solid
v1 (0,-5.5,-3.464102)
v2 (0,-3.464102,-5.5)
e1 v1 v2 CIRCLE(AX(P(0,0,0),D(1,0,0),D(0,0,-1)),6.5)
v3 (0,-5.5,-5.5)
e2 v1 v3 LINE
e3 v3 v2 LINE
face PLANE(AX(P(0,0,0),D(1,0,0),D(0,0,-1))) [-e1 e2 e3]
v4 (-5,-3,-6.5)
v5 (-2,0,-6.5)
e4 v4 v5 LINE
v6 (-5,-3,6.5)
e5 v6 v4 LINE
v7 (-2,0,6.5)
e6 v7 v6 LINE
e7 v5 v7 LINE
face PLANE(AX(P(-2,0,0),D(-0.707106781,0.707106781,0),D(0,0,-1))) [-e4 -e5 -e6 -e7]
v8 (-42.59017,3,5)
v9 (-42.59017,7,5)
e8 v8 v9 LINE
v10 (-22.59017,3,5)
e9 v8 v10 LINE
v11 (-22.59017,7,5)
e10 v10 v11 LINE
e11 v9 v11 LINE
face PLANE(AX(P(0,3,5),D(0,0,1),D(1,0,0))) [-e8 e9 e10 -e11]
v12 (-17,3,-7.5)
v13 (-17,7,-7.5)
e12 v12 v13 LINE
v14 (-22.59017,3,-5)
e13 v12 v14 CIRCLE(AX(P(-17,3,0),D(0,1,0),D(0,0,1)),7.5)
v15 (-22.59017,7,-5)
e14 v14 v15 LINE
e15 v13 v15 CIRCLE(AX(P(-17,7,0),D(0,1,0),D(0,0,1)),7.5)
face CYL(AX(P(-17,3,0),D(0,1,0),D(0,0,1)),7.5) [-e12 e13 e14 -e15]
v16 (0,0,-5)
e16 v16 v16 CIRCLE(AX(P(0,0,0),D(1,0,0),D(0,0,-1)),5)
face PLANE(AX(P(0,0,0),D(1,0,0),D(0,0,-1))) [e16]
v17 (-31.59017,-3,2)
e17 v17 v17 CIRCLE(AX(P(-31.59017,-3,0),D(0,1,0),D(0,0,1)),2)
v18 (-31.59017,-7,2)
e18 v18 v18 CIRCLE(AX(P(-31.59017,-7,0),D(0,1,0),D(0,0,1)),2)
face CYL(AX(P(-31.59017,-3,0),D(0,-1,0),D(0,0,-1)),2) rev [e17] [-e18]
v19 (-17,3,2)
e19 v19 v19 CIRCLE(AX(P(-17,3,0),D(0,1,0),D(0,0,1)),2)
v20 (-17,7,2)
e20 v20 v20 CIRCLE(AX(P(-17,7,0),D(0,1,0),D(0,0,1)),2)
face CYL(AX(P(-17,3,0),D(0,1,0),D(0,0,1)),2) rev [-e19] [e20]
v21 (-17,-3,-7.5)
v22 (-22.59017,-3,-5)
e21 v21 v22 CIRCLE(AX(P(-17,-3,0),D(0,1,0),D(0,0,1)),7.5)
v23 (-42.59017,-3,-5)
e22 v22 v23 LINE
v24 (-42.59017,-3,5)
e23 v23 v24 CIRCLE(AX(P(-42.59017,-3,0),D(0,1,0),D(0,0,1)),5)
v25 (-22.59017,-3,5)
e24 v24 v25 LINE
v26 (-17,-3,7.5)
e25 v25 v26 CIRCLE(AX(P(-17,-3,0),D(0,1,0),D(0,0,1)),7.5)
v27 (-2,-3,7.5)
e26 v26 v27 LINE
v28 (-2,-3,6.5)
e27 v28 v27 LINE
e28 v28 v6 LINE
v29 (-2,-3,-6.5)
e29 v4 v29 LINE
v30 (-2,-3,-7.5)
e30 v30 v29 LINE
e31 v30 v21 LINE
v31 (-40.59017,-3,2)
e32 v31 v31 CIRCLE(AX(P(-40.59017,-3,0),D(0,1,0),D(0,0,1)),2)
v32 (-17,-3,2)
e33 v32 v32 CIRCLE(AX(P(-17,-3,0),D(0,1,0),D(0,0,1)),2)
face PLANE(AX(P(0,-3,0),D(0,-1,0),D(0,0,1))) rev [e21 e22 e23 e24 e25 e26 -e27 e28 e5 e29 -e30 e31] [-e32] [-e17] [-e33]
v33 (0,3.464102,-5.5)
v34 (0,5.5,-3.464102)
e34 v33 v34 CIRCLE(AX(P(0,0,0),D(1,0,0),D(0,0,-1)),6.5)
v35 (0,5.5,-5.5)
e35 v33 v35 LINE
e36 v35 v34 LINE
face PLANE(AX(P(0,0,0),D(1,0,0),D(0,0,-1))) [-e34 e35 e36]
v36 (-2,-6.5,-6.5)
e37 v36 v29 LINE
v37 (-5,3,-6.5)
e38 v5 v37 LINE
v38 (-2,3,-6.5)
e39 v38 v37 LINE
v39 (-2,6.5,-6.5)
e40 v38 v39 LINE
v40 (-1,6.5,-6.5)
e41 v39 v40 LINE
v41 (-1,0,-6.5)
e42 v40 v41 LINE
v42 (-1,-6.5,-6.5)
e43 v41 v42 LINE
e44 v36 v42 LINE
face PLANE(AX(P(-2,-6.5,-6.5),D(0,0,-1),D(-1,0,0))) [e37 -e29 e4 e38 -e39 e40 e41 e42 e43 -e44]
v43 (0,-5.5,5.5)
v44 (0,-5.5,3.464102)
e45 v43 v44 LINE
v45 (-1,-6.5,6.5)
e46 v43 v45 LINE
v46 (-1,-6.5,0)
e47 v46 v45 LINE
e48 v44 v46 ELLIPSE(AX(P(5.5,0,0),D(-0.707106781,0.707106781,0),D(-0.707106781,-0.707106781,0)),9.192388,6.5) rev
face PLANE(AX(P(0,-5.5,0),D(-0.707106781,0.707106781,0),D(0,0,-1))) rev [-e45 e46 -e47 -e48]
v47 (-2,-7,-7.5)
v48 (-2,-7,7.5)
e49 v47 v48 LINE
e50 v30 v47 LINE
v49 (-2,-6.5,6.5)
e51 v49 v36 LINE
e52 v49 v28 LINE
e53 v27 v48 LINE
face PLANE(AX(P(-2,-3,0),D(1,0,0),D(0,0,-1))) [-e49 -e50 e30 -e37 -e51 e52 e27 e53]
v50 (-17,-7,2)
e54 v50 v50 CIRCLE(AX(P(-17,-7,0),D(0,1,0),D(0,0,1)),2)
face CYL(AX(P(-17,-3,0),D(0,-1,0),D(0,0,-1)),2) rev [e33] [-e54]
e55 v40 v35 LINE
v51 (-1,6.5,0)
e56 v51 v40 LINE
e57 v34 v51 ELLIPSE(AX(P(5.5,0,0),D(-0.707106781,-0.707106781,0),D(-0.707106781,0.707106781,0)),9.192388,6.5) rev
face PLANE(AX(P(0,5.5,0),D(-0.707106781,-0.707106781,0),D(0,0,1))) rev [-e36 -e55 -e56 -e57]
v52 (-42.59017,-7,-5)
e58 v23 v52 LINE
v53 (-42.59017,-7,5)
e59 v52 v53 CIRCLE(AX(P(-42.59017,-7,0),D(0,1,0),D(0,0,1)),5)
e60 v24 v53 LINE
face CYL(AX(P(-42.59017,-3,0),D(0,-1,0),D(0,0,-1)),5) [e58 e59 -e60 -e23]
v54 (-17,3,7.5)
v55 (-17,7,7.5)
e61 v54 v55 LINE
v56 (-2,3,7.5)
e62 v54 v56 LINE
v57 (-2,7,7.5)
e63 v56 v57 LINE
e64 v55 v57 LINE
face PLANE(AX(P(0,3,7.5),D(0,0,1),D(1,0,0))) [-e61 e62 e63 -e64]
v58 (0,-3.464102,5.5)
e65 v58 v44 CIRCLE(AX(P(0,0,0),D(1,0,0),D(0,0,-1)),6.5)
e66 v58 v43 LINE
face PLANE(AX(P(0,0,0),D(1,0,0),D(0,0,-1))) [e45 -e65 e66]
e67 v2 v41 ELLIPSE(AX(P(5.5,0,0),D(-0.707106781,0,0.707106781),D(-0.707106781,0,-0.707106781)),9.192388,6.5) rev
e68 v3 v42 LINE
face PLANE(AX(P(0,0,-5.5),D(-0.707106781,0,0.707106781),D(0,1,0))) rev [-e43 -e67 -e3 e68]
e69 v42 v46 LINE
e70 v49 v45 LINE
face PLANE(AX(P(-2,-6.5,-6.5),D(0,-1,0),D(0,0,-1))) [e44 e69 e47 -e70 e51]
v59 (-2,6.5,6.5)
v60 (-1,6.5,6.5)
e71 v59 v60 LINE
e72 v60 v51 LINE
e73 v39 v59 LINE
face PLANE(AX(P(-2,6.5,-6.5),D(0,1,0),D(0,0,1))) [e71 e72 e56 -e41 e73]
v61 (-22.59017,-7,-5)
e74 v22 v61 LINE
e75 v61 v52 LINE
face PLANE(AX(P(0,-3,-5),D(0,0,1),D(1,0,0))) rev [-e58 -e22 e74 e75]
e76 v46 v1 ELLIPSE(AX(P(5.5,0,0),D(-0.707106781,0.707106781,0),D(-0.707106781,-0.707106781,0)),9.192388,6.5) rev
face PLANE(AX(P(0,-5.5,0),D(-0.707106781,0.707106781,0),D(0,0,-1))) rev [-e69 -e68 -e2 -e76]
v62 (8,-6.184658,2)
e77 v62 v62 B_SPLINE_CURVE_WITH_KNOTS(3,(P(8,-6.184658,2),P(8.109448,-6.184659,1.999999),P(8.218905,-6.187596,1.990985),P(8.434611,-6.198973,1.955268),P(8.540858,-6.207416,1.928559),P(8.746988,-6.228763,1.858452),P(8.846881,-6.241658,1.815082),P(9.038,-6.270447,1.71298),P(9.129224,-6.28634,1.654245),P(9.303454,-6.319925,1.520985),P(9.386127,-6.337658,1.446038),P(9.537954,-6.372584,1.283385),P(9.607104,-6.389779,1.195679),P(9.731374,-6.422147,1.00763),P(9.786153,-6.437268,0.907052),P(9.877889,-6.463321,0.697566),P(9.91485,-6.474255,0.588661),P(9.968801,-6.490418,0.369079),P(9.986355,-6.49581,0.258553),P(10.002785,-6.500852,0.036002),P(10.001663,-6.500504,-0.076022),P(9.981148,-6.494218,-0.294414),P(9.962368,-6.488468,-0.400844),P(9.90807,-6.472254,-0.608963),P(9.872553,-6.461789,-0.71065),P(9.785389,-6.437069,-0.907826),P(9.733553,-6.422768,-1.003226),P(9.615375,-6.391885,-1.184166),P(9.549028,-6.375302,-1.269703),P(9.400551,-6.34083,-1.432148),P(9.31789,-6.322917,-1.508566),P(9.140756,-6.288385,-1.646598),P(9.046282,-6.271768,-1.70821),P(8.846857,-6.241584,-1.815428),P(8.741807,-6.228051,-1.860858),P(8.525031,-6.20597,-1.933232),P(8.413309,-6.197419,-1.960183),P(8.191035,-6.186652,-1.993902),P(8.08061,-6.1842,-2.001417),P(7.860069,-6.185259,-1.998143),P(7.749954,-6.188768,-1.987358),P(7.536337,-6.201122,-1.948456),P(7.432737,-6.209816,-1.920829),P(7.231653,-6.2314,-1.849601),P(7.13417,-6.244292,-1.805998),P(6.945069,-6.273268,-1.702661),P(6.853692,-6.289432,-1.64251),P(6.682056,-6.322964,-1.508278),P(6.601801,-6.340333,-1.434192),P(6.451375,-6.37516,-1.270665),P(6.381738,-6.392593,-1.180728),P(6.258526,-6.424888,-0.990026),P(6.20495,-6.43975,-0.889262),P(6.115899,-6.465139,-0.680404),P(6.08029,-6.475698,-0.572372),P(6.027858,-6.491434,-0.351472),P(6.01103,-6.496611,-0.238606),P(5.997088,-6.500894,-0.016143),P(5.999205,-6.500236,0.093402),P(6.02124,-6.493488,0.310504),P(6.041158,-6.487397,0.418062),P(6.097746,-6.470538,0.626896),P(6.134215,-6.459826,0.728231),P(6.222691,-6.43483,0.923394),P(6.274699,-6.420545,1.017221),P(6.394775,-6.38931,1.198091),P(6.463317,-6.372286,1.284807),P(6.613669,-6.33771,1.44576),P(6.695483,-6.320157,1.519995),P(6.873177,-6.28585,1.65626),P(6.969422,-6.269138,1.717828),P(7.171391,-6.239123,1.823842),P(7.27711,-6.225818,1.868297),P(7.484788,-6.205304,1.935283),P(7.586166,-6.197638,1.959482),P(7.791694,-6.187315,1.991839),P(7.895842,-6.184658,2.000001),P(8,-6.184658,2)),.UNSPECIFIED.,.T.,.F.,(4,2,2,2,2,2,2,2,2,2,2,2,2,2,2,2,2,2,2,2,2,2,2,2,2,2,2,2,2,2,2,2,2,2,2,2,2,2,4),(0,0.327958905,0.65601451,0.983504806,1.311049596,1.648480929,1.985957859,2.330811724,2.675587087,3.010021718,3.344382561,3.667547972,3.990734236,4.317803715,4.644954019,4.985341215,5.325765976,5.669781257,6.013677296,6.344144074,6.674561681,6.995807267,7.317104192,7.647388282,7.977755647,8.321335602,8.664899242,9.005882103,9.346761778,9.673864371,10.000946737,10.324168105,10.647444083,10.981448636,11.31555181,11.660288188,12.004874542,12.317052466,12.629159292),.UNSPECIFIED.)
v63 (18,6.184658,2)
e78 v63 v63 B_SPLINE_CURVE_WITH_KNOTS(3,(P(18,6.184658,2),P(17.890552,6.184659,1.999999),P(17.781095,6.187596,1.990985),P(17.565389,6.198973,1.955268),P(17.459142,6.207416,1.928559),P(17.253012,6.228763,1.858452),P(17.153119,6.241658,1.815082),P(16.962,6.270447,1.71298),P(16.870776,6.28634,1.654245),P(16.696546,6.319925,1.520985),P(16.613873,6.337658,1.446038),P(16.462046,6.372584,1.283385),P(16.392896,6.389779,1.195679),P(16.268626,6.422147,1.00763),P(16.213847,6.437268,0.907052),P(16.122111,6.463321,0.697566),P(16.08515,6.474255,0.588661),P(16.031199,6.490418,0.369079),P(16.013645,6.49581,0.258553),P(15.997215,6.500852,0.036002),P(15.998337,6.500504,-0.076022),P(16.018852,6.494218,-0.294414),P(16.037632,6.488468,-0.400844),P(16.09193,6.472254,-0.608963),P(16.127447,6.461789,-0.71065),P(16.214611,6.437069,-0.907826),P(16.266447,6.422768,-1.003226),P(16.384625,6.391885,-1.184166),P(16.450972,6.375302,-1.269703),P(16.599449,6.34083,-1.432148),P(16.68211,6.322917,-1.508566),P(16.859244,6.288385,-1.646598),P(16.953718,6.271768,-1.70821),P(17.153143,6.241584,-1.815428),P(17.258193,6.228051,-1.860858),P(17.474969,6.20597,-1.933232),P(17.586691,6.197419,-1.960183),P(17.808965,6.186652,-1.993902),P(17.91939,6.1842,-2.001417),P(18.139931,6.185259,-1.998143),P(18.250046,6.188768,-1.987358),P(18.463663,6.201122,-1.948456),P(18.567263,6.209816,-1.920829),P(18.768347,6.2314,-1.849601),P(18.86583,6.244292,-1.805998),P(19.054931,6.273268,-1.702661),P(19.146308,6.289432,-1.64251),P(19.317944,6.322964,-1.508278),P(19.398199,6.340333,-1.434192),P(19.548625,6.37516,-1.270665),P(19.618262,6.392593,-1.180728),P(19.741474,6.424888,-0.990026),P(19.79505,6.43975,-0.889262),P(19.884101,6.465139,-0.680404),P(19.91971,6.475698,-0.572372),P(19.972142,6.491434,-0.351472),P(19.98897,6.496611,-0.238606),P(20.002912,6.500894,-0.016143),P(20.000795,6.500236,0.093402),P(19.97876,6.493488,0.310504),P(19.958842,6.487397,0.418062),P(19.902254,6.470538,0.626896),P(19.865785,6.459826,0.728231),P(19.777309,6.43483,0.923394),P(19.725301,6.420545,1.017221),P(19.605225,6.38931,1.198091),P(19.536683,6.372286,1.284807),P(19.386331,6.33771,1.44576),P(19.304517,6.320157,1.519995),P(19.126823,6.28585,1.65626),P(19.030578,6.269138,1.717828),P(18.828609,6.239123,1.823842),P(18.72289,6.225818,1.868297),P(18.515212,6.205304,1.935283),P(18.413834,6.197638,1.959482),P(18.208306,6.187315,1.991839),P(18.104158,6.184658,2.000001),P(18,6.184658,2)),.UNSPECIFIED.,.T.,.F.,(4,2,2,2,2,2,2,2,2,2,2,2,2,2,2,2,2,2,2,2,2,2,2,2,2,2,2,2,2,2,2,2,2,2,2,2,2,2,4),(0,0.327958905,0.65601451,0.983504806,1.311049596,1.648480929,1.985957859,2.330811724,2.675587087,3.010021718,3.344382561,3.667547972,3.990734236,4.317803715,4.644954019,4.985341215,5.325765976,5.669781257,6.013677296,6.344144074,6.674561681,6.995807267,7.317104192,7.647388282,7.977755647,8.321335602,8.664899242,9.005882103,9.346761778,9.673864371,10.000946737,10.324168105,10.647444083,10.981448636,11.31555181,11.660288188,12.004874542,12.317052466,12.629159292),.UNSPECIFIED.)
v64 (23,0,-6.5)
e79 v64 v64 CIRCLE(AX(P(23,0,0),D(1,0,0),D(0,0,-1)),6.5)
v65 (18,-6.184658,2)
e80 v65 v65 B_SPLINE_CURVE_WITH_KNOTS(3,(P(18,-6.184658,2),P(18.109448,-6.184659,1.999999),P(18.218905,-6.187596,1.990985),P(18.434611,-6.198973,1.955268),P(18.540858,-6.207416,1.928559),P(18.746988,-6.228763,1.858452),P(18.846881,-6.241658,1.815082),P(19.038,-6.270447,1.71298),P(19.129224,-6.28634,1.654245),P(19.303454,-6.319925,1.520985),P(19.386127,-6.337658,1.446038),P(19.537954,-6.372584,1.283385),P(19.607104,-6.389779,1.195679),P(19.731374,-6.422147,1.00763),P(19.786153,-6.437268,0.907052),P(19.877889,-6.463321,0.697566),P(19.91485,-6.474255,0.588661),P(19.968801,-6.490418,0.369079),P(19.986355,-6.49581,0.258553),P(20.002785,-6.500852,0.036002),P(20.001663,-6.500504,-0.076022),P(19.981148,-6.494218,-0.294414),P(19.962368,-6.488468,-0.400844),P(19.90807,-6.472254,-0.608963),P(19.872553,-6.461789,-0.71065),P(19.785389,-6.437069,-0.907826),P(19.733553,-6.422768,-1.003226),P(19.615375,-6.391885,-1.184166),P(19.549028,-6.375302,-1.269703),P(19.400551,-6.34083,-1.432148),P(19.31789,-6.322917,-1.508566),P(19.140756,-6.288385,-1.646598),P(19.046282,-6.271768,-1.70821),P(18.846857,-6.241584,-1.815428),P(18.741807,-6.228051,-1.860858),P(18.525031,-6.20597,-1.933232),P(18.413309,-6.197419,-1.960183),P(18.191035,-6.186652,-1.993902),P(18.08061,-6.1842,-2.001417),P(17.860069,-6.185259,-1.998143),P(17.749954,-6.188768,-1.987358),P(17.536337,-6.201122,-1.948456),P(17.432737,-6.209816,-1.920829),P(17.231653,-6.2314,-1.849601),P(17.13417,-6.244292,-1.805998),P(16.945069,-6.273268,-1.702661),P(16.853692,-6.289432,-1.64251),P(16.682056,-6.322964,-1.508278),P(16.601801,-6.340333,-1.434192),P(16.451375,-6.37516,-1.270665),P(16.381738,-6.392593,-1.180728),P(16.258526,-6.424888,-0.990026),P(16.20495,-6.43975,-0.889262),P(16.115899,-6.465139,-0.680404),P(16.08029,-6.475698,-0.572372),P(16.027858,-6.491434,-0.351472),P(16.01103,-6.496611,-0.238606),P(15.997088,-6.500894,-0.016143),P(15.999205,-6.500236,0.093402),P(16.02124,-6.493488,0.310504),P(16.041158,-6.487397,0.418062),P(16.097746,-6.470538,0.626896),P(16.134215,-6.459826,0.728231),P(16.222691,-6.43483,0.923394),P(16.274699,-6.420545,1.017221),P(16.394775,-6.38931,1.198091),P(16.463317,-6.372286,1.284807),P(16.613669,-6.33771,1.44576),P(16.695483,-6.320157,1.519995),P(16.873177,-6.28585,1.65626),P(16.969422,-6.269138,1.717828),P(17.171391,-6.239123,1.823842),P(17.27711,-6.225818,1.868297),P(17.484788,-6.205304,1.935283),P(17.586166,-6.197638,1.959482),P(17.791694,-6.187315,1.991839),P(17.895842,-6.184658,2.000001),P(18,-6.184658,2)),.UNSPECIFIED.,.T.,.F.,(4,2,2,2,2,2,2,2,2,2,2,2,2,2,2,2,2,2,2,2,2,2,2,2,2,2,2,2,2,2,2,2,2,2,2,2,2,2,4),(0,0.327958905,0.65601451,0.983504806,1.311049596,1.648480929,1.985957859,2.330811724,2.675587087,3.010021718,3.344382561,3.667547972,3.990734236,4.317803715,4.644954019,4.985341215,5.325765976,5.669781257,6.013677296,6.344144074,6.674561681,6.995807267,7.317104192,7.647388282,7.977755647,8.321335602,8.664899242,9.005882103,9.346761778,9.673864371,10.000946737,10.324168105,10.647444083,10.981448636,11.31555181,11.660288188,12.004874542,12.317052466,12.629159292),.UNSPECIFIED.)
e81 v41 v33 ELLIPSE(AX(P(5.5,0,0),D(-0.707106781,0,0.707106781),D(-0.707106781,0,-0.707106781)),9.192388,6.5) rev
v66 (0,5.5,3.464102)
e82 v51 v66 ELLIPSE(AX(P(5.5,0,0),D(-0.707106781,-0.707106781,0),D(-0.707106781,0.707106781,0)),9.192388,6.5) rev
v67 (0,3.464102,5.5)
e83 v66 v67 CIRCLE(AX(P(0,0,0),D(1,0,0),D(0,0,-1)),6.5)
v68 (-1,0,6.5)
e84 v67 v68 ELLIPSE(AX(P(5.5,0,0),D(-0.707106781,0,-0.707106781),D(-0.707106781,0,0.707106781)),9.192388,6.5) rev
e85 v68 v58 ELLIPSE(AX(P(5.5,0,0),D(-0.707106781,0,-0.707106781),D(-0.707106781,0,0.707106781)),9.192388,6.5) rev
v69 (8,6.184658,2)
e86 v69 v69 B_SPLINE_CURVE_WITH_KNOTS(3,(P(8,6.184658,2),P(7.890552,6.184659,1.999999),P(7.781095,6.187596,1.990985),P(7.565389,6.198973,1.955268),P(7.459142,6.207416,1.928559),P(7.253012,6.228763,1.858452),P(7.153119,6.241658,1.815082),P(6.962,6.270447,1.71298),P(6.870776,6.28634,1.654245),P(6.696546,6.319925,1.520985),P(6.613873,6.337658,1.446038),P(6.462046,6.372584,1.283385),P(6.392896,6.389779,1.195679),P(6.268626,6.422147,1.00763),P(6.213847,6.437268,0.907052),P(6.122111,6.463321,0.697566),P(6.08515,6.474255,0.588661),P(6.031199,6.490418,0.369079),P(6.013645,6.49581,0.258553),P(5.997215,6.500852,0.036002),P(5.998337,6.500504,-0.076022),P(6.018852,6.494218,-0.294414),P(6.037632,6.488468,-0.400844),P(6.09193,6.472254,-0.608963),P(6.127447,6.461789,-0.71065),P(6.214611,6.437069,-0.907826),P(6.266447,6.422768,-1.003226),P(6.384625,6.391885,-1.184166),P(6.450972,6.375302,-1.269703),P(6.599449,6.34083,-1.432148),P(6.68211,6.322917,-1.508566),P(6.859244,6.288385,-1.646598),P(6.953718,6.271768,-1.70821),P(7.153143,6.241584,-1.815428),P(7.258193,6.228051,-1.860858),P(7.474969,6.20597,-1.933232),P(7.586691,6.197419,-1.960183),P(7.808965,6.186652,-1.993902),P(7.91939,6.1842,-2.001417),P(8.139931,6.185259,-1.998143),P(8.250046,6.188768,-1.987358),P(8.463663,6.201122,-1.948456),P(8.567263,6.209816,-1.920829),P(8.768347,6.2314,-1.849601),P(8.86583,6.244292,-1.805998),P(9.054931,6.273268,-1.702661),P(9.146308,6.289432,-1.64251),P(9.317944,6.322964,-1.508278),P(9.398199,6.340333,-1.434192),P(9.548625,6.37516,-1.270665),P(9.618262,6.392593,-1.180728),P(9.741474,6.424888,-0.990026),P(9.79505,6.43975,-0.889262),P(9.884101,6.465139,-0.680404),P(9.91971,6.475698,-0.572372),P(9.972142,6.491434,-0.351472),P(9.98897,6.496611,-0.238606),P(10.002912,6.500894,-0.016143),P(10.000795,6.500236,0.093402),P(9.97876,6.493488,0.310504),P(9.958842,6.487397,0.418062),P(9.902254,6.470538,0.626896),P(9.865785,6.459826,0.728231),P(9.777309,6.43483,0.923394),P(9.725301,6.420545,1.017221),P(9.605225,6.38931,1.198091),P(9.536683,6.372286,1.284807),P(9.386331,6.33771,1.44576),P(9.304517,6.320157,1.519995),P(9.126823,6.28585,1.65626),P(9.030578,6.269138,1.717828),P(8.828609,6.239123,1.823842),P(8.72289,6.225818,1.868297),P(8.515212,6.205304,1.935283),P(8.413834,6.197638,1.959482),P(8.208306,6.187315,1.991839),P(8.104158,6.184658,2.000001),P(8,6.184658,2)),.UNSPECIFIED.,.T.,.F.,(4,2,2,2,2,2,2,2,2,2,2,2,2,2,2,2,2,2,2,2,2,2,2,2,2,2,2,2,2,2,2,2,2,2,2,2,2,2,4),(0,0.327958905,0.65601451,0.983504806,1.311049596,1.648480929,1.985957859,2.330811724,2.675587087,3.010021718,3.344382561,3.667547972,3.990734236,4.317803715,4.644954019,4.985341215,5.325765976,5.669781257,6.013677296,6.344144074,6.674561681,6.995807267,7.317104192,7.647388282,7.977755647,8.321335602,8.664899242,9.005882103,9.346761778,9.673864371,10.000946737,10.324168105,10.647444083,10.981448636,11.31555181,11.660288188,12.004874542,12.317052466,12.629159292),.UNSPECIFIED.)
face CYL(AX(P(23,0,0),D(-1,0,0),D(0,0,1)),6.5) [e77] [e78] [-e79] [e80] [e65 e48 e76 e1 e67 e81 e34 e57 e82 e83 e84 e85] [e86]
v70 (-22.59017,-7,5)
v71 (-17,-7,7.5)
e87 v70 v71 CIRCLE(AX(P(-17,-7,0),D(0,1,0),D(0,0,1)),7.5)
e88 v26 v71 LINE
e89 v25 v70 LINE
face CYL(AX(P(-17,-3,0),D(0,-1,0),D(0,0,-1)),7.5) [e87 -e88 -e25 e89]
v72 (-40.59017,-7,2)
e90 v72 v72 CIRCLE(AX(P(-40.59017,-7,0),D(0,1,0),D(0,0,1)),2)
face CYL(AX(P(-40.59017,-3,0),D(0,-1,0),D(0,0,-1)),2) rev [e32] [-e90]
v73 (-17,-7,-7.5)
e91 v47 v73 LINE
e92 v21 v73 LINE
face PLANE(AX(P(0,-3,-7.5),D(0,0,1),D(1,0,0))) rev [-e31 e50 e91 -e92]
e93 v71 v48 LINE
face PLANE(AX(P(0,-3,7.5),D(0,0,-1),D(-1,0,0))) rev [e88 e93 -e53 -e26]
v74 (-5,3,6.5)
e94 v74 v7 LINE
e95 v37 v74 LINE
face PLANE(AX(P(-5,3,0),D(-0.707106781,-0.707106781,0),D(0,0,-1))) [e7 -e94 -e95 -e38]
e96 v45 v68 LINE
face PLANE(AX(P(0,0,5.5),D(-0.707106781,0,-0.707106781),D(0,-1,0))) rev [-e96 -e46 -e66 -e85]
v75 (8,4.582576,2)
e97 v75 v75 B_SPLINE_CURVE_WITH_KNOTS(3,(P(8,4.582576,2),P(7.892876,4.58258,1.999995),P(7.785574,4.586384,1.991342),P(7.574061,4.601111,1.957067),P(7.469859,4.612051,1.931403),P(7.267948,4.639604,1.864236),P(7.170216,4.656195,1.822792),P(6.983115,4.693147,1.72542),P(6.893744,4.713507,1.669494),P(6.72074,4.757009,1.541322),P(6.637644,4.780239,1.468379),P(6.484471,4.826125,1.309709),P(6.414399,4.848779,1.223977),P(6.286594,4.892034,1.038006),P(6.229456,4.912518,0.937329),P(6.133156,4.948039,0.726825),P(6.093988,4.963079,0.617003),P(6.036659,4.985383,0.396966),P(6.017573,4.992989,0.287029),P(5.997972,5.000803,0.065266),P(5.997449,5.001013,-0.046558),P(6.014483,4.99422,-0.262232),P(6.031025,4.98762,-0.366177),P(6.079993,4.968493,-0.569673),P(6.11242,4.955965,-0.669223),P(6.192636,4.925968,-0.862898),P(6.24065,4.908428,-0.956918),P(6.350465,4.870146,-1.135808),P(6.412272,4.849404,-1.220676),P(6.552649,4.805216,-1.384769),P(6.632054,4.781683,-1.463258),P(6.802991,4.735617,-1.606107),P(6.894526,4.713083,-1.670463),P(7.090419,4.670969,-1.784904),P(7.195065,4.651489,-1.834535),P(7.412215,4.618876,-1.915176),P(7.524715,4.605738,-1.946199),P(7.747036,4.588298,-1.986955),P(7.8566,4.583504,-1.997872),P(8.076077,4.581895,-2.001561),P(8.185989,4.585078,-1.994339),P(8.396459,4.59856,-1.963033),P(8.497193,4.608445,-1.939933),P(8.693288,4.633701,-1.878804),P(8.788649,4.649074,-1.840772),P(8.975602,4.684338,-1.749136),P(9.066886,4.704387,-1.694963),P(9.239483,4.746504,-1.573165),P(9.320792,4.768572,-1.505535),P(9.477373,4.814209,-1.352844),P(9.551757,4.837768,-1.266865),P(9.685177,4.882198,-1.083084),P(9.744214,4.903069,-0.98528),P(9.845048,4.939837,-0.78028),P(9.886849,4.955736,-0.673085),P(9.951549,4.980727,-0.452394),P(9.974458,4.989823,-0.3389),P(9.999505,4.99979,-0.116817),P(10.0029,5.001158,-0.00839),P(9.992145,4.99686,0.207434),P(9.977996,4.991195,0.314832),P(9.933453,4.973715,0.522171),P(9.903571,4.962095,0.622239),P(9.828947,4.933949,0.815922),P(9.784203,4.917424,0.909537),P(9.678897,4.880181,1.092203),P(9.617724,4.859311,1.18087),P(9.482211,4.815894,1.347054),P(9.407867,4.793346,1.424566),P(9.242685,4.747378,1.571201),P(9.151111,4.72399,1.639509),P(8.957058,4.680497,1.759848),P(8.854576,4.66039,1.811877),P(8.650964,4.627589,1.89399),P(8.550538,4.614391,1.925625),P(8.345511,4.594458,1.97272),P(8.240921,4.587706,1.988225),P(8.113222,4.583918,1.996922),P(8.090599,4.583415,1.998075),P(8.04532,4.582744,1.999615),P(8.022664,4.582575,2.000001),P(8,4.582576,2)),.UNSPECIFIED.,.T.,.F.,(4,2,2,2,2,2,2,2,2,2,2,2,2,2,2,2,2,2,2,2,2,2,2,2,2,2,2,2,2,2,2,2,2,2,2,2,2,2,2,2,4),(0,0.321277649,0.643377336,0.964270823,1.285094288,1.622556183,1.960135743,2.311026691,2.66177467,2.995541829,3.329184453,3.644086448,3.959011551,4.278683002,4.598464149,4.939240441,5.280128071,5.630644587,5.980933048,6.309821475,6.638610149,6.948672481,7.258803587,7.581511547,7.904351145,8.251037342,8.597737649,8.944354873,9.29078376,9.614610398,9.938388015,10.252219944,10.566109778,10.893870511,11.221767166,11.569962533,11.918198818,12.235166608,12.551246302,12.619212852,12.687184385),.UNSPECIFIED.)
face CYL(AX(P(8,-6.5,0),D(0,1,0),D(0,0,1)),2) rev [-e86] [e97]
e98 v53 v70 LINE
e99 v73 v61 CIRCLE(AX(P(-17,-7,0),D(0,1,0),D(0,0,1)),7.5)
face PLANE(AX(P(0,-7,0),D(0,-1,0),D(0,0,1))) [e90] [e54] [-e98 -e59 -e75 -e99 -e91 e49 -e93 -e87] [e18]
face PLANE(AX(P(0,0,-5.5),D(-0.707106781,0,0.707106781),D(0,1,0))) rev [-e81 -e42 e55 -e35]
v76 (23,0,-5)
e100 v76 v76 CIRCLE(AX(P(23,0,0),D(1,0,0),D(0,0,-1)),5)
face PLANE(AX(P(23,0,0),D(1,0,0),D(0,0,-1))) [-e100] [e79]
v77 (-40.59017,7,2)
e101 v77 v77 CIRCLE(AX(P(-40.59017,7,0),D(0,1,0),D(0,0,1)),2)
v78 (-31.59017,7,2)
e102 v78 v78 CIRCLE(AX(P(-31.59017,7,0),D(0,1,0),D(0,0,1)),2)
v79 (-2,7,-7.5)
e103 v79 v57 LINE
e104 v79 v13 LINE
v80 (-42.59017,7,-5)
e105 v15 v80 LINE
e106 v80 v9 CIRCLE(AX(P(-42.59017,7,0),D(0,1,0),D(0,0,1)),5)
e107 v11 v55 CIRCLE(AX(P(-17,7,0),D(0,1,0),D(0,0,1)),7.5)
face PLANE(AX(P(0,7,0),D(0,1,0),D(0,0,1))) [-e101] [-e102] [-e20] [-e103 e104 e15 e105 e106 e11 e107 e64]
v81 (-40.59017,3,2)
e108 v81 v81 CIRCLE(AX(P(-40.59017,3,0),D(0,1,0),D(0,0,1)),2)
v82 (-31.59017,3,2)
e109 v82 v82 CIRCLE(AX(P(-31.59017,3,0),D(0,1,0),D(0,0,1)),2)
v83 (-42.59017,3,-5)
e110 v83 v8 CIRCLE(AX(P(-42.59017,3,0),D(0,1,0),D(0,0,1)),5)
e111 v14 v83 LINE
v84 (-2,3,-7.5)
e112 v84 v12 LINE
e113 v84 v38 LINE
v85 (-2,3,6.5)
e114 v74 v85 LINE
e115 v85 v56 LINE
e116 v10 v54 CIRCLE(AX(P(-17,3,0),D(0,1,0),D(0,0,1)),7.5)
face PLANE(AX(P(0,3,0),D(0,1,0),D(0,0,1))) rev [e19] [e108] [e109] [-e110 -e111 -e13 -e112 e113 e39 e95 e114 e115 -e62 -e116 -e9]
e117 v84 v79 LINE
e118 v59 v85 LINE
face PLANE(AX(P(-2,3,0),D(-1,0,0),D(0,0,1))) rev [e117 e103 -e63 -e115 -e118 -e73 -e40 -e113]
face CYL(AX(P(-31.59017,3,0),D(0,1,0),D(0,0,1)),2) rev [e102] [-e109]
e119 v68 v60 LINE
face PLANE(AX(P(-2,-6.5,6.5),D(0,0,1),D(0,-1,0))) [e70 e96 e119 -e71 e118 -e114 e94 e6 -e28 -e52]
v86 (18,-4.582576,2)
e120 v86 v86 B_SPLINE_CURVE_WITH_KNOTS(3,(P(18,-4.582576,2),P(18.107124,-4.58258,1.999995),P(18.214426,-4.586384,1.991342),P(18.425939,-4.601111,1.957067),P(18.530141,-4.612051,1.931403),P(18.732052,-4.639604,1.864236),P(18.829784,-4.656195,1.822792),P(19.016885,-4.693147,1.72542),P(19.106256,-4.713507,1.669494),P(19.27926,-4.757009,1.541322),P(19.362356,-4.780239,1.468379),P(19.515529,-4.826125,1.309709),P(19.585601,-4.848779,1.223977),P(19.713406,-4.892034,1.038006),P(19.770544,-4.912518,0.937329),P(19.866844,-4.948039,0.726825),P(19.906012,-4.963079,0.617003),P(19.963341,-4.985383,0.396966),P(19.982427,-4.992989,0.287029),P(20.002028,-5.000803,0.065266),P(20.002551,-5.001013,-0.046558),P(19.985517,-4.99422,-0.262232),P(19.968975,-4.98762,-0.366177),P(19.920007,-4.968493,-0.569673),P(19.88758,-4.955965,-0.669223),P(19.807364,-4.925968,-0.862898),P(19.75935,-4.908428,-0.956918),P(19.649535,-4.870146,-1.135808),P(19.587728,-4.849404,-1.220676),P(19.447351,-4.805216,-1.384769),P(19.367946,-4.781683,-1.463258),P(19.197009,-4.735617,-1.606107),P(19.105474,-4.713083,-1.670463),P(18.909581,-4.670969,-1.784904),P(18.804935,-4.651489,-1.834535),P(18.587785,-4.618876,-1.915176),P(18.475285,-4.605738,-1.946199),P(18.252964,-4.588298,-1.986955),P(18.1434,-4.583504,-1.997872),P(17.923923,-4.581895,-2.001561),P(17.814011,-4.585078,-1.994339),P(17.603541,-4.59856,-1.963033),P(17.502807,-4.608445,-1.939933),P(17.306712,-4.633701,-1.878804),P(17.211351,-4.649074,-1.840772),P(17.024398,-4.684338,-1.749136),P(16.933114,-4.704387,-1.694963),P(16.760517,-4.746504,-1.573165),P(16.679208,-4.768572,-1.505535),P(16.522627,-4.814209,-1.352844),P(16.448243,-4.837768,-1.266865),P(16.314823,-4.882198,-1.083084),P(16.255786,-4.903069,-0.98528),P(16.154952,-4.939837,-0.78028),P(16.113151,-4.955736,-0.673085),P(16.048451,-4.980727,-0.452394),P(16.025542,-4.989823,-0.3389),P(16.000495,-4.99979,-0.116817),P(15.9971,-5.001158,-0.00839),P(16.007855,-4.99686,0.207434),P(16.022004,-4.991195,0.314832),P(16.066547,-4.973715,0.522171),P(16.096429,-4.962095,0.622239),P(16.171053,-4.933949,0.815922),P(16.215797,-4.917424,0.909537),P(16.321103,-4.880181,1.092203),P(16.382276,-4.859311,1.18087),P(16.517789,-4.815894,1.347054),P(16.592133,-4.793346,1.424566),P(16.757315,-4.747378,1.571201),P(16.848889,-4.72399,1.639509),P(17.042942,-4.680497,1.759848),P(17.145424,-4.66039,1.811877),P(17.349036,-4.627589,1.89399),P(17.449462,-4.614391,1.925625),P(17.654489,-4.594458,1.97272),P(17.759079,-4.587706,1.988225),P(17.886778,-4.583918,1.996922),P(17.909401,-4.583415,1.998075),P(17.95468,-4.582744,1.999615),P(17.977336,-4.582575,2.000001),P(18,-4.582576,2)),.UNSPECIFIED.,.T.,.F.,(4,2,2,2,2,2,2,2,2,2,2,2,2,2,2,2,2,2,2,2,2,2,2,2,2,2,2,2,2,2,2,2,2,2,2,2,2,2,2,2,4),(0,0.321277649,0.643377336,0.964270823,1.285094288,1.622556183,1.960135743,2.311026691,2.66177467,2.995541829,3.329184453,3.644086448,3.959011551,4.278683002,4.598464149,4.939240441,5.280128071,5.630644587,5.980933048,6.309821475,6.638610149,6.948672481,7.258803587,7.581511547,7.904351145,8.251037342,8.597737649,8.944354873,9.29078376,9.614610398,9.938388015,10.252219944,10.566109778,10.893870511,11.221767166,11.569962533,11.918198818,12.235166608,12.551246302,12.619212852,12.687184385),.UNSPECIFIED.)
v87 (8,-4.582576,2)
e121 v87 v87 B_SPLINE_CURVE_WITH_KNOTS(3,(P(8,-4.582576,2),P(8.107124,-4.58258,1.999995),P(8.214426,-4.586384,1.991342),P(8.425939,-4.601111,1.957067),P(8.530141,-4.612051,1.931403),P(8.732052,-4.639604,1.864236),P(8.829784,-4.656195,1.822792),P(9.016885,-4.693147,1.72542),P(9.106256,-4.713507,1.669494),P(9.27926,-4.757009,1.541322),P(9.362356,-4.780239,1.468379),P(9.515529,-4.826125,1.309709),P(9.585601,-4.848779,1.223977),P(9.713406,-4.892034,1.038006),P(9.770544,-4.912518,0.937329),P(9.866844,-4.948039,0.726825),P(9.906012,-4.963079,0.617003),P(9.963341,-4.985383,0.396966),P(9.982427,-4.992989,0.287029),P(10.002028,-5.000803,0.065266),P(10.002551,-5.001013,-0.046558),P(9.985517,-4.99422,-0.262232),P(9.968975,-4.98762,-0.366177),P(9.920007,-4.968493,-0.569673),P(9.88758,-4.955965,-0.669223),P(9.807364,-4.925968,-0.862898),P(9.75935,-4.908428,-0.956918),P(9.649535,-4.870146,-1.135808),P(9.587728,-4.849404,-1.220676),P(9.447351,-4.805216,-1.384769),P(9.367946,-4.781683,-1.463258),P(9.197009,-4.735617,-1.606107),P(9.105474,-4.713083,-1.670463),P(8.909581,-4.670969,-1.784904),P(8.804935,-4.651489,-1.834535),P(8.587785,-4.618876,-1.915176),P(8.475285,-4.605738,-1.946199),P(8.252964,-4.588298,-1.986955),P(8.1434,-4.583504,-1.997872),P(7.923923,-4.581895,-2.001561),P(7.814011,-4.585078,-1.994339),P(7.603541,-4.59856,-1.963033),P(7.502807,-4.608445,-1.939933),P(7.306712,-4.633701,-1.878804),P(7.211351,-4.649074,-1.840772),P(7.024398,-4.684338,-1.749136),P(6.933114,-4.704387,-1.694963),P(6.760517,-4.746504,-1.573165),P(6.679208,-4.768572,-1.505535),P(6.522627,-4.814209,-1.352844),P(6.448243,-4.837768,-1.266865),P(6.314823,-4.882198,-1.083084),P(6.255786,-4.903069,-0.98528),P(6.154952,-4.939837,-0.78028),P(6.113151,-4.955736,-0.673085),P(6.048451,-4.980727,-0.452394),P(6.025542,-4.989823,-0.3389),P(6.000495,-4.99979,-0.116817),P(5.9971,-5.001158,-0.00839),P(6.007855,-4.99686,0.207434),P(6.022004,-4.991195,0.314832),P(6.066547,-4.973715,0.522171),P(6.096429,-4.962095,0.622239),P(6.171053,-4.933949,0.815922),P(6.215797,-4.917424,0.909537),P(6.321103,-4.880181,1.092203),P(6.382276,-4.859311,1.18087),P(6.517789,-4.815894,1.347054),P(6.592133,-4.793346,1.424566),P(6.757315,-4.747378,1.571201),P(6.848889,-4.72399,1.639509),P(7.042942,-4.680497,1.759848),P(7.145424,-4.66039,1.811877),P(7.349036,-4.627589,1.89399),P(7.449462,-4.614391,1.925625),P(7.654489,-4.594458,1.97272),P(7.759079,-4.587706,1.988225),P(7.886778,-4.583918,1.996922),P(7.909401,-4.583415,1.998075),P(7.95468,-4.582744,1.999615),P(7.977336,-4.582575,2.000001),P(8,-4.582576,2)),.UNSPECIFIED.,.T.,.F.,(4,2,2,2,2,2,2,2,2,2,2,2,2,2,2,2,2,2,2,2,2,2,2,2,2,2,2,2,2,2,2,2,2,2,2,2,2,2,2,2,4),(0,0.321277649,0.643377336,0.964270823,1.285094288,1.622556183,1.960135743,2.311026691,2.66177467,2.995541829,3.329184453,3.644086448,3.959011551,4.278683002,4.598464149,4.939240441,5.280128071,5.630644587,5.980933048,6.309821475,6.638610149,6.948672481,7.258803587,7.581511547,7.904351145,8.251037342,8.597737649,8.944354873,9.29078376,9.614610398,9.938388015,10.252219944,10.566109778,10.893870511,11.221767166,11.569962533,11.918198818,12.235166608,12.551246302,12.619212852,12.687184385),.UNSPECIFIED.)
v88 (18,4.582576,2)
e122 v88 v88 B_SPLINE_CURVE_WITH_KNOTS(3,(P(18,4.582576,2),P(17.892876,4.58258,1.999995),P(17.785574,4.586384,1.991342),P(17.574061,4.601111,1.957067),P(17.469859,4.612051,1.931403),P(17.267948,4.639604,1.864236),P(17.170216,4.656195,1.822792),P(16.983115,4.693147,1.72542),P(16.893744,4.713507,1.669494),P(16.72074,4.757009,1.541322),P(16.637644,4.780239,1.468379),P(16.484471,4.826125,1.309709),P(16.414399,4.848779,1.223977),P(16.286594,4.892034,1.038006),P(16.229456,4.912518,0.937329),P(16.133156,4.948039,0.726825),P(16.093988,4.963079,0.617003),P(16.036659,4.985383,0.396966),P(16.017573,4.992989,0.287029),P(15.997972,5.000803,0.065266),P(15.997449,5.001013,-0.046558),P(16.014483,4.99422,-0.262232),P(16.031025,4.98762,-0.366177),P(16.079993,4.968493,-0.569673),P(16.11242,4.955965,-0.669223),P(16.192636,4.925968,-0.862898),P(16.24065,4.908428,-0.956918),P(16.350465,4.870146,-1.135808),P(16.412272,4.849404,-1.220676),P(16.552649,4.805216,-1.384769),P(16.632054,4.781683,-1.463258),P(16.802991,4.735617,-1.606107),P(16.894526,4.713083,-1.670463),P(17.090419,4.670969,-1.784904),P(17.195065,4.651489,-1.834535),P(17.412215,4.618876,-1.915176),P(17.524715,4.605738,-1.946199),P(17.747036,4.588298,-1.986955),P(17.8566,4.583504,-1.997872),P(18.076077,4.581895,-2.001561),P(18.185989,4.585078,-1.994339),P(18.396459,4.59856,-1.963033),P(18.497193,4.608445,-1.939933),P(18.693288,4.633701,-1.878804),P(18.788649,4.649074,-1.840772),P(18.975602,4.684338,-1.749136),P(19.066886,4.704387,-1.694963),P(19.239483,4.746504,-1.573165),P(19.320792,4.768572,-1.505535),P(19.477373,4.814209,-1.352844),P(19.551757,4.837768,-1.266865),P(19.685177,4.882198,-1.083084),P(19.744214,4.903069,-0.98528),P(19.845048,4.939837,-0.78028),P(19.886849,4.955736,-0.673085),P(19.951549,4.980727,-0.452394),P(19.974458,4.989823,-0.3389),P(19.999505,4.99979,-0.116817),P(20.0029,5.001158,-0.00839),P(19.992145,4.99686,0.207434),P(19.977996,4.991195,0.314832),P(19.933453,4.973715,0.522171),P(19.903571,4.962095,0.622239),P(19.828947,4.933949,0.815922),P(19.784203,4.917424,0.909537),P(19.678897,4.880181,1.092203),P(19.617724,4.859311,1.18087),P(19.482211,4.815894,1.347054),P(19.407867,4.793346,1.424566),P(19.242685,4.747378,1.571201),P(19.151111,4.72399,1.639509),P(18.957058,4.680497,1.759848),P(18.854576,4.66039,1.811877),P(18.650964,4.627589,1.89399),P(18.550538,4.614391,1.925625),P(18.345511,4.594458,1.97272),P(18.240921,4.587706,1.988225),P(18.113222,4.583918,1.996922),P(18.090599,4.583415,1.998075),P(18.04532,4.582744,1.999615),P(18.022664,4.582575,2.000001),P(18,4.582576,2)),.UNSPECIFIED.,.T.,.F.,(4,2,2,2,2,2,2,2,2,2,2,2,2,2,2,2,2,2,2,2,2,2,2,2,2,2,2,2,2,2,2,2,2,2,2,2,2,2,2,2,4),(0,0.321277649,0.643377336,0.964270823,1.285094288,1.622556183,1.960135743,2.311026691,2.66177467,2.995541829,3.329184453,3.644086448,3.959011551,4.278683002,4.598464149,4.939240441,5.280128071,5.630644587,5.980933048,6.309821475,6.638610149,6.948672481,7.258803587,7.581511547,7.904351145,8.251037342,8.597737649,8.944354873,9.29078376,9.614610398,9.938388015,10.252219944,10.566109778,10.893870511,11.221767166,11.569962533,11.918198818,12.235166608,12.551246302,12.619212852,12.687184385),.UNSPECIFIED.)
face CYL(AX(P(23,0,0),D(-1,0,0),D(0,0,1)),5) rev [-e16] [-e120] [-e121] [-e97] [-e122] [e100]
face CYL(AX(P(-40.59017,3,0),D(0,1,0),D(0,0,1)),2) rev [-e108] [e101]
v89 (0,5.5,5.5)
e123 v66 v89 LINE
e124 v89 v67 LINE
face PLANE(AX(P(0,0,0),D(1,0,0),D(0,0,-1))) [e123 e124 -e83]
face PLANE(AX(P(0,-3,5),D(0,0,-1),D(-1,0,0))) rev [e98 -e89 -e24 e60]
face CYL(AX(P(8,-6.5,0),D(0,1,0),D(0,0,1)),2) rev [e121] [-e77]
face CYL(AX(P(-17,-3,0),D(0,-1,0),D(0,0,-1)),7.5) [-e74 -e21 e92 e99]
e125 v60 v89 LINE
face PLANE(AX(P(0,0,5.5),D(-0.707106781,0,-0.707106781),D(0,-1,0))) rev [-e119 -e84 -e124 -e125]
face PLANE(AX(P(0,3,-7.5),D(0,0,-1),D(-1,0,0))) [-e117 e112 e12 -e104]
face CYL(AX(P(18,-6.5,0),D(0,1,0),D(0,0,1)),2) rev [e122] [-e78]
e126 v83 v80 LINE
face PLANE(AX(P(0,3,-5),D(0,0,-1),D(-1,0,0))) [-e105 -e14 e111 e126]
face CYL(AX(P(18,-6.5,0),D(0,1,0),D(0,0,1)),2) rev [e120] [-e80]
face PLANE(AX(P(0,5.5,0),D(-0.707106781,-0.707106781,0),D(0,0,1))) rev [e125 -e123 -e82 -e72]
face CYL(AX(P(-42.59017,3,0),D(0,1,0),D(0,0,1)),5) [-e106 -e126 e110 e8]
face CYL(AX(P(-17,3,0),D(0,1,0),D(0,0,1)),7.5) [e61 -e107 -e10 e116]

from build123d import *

# Parameters (mm, degrees)
SKETCH1_R               = 6.5
SKETCH1_R_2             = 5
BOSS_EXTRUDE1_DEPTH     = 23
SKETCH2_W               = 13
SKETCH2_H               = 13
BOSS_EXTRUDE2_DEPTH     = 2
CUT_EXTRUDE1_DEPTH      = 25.768932153
CUT_EXTRUDE1_DEPTH_BACK = 25.768932153
SKETCH4_R               = 2
SKETCH5_R               = 2
BOSS_EXTRUDE5_DEPTH     = 4
CHAMFER2_SIZE           = 3
CHAMFER3_SIZE           = 1


# Some blends are built 0.0001 mm under size
with BuildPart() as part:
    # Sketch1 → Boss-Extrude1 (new body)
    with BuildSketch(Plane(origin=(0, 0, 0), x_dir=(0, 0, -1), z_dir=(1, 0, 0))):
        Circle(SKETCH1_R)
        Circle(SKETCH1_R_2, mode=Mode.SUBTRACT)
    extrude(amount=BOSS_EXTRUDE1_DEPTH)

    # Sketch2 → Boss-Extrude2 (add)
    with BuildSketch(Plane(origin=(0, 0, 0), x_dir=(0, 0, -1), z_dir=(1, 0, 0))):
        Rectangle(SKETCH2_W, SKETCH2_H)
    extrude(amount=-BOSS_EXTRUDE2_DEPTH)

    # Sketch4 → Cut-Extrude1 (cut, two sides: drawn at the far end of the back side and taken through both)
    with BuildSketch(Plane(origin=(0, 0, 0), x_dir=(1, 0, 0), z_dir=(0, 1, 0)).offset(-CUT_EXTRUDE1_DEPTH_BACK)):
        with Locations(Location((8, 0, 0), (0, 0, 270))):
            Circle(SKETCH4_R)
        with Locations(Location((18, 0, 0), (0, 0, 270))):
            Circle(SKETCH4_R)
    extrude(amount=CUT_EXTRUDE1_DEPTH + CUT_EXTRUDE1_DEPTH_BACK, mode=Mode.SUBTRACT)

    # Sketch5 → Boss-Extrude5 (add)
    with BuildSketch(Plane(origin=(0, 7, 0), x_dir=(1, 0, 0), z_dir=(0, 1, 0))):
        with BuildLine():
            Line((-2, 7.5), (-2, -7.5))
            Line((-2, -7.5), (-17, -7.5))
            ThreePointArc((-17, -7.5), (-20.061862178, -6.846531969), (-22.590169944, -5))
            Line((-22.590169944, -5), (-42.590169944, -5))
            ThreePointArc((-42.590169944, -5), (-47.590169944, 0), (-42.590169944, 5))
            Line((-42.590169944, 5), (-22.590169944, 5))
            ThreePointArc((-22.590169944, 5), (-20.061862178, 6.846531969), (-17, 7.5))
            Line((-17, 7.5), (-2, 7.5))
        make_face()
        with Locations(Location((-40.590169944, 0, 0), (0, 0, 270))):
            Circle(SKETCH5_R, mode=Mode.SUBTRACT)
        with Locations(Location((-17, 0, 0), (0, 0, 270))):
            Circle(SKETCH5_R, mode=Mode.SUBTRACT)
        with Locations(Location((-31.590169944, 0, 0), (0, 0, 270))):
            Circle(SKETCH5_R, mode=Mode.SUBTRACT)
    boss_extrude5 = extrude(amount=-BOSS_EXTRUDE5_DEPTH)

    # Mirror2: Boss-Extrude5 across plane
    add(boss_extrude5.mirror(Plane.ZX))

    # Chamfer2
    chamfer2_edges = [part.edges().sort_by_distance(p)[0] for p in [
        (-2, 3, 0),
        (-2, -3, 0),
    ]]
    chamfer(chamfer2_edges, length=CHAMFER2_SIZE - 0.0001)  # a hair under: the kernel refuses the full size

    # Chamfer3
    # the kernel refuses this chamfer: 1 mm, written as the material it takes off along each edge
    with BuildSketch(Plane(origin=(0, 9.071682988, -6.5), x_dir=(-0.9996219169112968, 0, -0.027495876610586494), z_dir=(0, -1, 0))) as chamfer3_piece_1_section:
        Polygon((CHAMFER3_SIZE * 0.999621916911, -CHAMFER3_SIZE * 0.0274958766106), (-CHAMFER3_SIZE * 0.0274958766106, -CHAMFER3_SIZE * 0.999621916911), (0, 0), align=None)
    chamfer3_piece_1 = extrude(amount=9.071682988, mode=Mode.PRIVATE)
    chamfer3_piece_1 = chamfer3_piece_1 - Plane(origin=(-0.352424936, 0, 0), x_dir=(0, 0, -1), z_dir=(-1, 0, 0)) * Cylinder(6.5, 23, mode=Mode.PRIVATE)
    add(chamfer3_piece_1, mode=Mode.SUBTRACT)
    with BuildSketch(Plane(origin=(0, 6.5, 2.6e-08), x_dir=(-0.9996219169112968, 0.027495876610586494, 0), z_dir=(0, 0, -1))) as chamfer3_piece_2_section:
        Polygon((CHAMFER3_SIZE * 0.999621916911, -CHAMFER3_SIZE * 0.0274958766106), (-CHAMFER3_SIZE * 0.0274958766106, -CHAMFER3_SIZE * 0.999621916911), (0, 0), align=None)
    chamfer3_piece_2 = extrude(amount=9.071683014, mode=Mode.PRIVATE)
    chamfer3_piece_2 = chamfer3_piece_2 - Plane(origin=(-0.352424936, 0, 0), x_dir=(0, 0, -1), z_dir=(-1, 0, 0)) * Cylinder(6.5, 23, mode=Mode.PRIVATE)
    add(chamfer3_piece_2, mode=Mode.SUBTRACT)
    with BuildSketch(Plane(origin=(0, 6.5, 9.071682988), x_dir=(-0.9996219169112968, 0.027495876610586494, 0), z_dir=(0, 0, -1))) as chamfer3_piece_3_section:
        Polygon((CHAMFER3_SIZE * 0.999621916911, -CHAMFER3_SIZE * 0.0274958766106), (-CHAMFER3_SIZE * 0.0274958766106, -CHAMFER3_SIZE * 0.999621916911), (0, 0), align=None)
    chamfer3_piece_3 = extrude(amount=9.071682962, mode=Mode.PRIVATE)
    chamfer3_piece_3 = chamfer3_piece_3 - Plane(origin=(-0.352424936, 0, 0), x_dir=(0, 0, -1), z_dir=(-1, 0, 0)) * Cylinder(6.5, 23, mode=Mode.PRIVATE)
    add(chamfer3_piece_3, mode=Mode.SUBTRACT)
    with BuildSketch(Plane(origin=(0, -8e-09, 6.5), x_dir=(-0.9996219169112968, 0, 0.027495876610586494), z_dir=(0, 1, 0))) as chamfer3_piece_4_section:
        Polygon((CHAMFER3_SIZE * 0.999621916911, -CHAMFER3_SIZE * 0.0274958766106), (-CHAMFER3_SIZE * 0.0274958766106, -CHAMFER3_SIZE * 0.999621916911), (0, 0), align=None)
    chamfer3_piece_4 = extrude(amount=9.071682996, mode=Mode.PRIVATE)
    chamfer3_piece_4 = chamfer3_piece_4 - Plane(origin=(-0.352424936, 0, 0), x_dir=(0, 0, -1), z_dir=(-1, 0, 0)) * Cylinder(6.5, 23, mode=Mode.PRIVATE)
    add(chamfer3_piece_4, mode=Mode.SUBTRACT)
    with BuildSketch(Plane(origin=(0, -9.071682988, 6.5), x_dir=(-0.9996219169112968, 0, 0.027495876610586494), z_dir=(0, 1, 0))) as chamfer3_piece_5_section:
        Polygon((CHAMFER3_SIZE * 0.999621916911, -CHAMFER3_SIZE * 0.0274958766106), (-CHAMFER3_SIZE * 0.0274958766106, -CHAMFER3_SIZE * 0.999621916911), (0, 0), align=None)
    chamfer3_piece_5 = extrude(amount=9.07168298, mode=Mode.PRIVATE)
    chamfer3_piece_5 = chamfer3_piece_5 - Plane(origin=(-0.352424936, 0, 0), x_dir=(0, 0, -1), z_dir=(-1, 0, 0)) * Cylinder(6.5, 23, mode=Mode.PRIVATE)
    add(chamfer3_piece_5, mode=Mode.SUBTRACT)
    with BuildSketch(Plane(origin=(0, -6.5, 0), x_dir=(-0.9996219169112968, -0.027495876610586494, 0), z_dir=(0, 0, 1))) as chamfer3_piece_6_section:
        Polygon((CHAMFER3_SIZE * 0.999621916911, -CHAMFER3_SIZE * 0.0274958766106), (-CHAMFER3_SIZE * 0.0274958766106, -CHAMFER3_SIZE * 0.999621916911), (0, 0), align=None)
    chamfer3_piece_6 = extrude(amount=9.071682988, mode=Mode.PRIVATE)
    chamfer3_piece_6 = chamfer3_piece_6 - Plane(origin=(-0.352424936, 0, 0), x_dir=(0, 0, -1), z_dir=(-1, 0, 0)) * Cylinder(6.5, 23, mode=Mode.PRIVATE)
    add(chamfer3_piece_6, mode=Mode.SUBTRACT)
    with BuildSketch(Plane(origin=(0, -6.5, -9.071682988), x_dir=(-0.9996219169112968, -0.027495876610586494, 0), z_dir=(0, 0, 1))) as chamfer3_piece_7_section:
        Polygon((CHAMFER3_SIZE * 0.999621916911, -CHAMFER3_SIZE * 0.0274958766106), (-CHAMFER3_SIZE * 0.0274958766106, -CHAMFER3_SIZE * 0.999621916911), (0, 0), align=None)
    chamfer3_piece_7 = extrude(amount=9.071682988, mode=Mode.PRIVATE)
    chamfer3_piece_7 = chamfer3_piece_7 - Plane(origin=(-0.352424936, 0, 0), x_dir=(0, 0, -1), z_dir=(-1, 0, 0)) * Cylinder(6.5, 23, mode=Mode.PRIVATE)
    add(chamfer3_piece_7, mode=Mode.SUBTRACT)
    with BuildSketch(Plane(origin=(0, 0, -6.5), x_dir=(-0.9996219169112968, 0, -0.027495876610586494), z_dir=(0, -1, 0))) as chamfer3_piece_8_section:
        Polygon((CHAMFER3_SIZE * 0.999621916911, -CHAMFER3_SIZE * 0.0274958766106), (-CHAMFER3_SIZE * 0.0274958766106, -CHAMFER3_SIZE * 0.999621916911), (0, 0), align=None)
    chamfer3_piece_8 = extrude(amount=9.071682988, mode=Mode.PRIVATE)
    chamfer3_piece_8 = chamfer3_piece_8 - Plane(origin=(-0.352424936, 0, 0), x_dir=(0, 0, -1), z_dir=(-1, 0, 0)) * Cylinder(6.5, 23, mode=Mode.PRIVATE)
    add(chamfer3_piece_8, mode=Mode.SUBTRACT)


solid = part.part
